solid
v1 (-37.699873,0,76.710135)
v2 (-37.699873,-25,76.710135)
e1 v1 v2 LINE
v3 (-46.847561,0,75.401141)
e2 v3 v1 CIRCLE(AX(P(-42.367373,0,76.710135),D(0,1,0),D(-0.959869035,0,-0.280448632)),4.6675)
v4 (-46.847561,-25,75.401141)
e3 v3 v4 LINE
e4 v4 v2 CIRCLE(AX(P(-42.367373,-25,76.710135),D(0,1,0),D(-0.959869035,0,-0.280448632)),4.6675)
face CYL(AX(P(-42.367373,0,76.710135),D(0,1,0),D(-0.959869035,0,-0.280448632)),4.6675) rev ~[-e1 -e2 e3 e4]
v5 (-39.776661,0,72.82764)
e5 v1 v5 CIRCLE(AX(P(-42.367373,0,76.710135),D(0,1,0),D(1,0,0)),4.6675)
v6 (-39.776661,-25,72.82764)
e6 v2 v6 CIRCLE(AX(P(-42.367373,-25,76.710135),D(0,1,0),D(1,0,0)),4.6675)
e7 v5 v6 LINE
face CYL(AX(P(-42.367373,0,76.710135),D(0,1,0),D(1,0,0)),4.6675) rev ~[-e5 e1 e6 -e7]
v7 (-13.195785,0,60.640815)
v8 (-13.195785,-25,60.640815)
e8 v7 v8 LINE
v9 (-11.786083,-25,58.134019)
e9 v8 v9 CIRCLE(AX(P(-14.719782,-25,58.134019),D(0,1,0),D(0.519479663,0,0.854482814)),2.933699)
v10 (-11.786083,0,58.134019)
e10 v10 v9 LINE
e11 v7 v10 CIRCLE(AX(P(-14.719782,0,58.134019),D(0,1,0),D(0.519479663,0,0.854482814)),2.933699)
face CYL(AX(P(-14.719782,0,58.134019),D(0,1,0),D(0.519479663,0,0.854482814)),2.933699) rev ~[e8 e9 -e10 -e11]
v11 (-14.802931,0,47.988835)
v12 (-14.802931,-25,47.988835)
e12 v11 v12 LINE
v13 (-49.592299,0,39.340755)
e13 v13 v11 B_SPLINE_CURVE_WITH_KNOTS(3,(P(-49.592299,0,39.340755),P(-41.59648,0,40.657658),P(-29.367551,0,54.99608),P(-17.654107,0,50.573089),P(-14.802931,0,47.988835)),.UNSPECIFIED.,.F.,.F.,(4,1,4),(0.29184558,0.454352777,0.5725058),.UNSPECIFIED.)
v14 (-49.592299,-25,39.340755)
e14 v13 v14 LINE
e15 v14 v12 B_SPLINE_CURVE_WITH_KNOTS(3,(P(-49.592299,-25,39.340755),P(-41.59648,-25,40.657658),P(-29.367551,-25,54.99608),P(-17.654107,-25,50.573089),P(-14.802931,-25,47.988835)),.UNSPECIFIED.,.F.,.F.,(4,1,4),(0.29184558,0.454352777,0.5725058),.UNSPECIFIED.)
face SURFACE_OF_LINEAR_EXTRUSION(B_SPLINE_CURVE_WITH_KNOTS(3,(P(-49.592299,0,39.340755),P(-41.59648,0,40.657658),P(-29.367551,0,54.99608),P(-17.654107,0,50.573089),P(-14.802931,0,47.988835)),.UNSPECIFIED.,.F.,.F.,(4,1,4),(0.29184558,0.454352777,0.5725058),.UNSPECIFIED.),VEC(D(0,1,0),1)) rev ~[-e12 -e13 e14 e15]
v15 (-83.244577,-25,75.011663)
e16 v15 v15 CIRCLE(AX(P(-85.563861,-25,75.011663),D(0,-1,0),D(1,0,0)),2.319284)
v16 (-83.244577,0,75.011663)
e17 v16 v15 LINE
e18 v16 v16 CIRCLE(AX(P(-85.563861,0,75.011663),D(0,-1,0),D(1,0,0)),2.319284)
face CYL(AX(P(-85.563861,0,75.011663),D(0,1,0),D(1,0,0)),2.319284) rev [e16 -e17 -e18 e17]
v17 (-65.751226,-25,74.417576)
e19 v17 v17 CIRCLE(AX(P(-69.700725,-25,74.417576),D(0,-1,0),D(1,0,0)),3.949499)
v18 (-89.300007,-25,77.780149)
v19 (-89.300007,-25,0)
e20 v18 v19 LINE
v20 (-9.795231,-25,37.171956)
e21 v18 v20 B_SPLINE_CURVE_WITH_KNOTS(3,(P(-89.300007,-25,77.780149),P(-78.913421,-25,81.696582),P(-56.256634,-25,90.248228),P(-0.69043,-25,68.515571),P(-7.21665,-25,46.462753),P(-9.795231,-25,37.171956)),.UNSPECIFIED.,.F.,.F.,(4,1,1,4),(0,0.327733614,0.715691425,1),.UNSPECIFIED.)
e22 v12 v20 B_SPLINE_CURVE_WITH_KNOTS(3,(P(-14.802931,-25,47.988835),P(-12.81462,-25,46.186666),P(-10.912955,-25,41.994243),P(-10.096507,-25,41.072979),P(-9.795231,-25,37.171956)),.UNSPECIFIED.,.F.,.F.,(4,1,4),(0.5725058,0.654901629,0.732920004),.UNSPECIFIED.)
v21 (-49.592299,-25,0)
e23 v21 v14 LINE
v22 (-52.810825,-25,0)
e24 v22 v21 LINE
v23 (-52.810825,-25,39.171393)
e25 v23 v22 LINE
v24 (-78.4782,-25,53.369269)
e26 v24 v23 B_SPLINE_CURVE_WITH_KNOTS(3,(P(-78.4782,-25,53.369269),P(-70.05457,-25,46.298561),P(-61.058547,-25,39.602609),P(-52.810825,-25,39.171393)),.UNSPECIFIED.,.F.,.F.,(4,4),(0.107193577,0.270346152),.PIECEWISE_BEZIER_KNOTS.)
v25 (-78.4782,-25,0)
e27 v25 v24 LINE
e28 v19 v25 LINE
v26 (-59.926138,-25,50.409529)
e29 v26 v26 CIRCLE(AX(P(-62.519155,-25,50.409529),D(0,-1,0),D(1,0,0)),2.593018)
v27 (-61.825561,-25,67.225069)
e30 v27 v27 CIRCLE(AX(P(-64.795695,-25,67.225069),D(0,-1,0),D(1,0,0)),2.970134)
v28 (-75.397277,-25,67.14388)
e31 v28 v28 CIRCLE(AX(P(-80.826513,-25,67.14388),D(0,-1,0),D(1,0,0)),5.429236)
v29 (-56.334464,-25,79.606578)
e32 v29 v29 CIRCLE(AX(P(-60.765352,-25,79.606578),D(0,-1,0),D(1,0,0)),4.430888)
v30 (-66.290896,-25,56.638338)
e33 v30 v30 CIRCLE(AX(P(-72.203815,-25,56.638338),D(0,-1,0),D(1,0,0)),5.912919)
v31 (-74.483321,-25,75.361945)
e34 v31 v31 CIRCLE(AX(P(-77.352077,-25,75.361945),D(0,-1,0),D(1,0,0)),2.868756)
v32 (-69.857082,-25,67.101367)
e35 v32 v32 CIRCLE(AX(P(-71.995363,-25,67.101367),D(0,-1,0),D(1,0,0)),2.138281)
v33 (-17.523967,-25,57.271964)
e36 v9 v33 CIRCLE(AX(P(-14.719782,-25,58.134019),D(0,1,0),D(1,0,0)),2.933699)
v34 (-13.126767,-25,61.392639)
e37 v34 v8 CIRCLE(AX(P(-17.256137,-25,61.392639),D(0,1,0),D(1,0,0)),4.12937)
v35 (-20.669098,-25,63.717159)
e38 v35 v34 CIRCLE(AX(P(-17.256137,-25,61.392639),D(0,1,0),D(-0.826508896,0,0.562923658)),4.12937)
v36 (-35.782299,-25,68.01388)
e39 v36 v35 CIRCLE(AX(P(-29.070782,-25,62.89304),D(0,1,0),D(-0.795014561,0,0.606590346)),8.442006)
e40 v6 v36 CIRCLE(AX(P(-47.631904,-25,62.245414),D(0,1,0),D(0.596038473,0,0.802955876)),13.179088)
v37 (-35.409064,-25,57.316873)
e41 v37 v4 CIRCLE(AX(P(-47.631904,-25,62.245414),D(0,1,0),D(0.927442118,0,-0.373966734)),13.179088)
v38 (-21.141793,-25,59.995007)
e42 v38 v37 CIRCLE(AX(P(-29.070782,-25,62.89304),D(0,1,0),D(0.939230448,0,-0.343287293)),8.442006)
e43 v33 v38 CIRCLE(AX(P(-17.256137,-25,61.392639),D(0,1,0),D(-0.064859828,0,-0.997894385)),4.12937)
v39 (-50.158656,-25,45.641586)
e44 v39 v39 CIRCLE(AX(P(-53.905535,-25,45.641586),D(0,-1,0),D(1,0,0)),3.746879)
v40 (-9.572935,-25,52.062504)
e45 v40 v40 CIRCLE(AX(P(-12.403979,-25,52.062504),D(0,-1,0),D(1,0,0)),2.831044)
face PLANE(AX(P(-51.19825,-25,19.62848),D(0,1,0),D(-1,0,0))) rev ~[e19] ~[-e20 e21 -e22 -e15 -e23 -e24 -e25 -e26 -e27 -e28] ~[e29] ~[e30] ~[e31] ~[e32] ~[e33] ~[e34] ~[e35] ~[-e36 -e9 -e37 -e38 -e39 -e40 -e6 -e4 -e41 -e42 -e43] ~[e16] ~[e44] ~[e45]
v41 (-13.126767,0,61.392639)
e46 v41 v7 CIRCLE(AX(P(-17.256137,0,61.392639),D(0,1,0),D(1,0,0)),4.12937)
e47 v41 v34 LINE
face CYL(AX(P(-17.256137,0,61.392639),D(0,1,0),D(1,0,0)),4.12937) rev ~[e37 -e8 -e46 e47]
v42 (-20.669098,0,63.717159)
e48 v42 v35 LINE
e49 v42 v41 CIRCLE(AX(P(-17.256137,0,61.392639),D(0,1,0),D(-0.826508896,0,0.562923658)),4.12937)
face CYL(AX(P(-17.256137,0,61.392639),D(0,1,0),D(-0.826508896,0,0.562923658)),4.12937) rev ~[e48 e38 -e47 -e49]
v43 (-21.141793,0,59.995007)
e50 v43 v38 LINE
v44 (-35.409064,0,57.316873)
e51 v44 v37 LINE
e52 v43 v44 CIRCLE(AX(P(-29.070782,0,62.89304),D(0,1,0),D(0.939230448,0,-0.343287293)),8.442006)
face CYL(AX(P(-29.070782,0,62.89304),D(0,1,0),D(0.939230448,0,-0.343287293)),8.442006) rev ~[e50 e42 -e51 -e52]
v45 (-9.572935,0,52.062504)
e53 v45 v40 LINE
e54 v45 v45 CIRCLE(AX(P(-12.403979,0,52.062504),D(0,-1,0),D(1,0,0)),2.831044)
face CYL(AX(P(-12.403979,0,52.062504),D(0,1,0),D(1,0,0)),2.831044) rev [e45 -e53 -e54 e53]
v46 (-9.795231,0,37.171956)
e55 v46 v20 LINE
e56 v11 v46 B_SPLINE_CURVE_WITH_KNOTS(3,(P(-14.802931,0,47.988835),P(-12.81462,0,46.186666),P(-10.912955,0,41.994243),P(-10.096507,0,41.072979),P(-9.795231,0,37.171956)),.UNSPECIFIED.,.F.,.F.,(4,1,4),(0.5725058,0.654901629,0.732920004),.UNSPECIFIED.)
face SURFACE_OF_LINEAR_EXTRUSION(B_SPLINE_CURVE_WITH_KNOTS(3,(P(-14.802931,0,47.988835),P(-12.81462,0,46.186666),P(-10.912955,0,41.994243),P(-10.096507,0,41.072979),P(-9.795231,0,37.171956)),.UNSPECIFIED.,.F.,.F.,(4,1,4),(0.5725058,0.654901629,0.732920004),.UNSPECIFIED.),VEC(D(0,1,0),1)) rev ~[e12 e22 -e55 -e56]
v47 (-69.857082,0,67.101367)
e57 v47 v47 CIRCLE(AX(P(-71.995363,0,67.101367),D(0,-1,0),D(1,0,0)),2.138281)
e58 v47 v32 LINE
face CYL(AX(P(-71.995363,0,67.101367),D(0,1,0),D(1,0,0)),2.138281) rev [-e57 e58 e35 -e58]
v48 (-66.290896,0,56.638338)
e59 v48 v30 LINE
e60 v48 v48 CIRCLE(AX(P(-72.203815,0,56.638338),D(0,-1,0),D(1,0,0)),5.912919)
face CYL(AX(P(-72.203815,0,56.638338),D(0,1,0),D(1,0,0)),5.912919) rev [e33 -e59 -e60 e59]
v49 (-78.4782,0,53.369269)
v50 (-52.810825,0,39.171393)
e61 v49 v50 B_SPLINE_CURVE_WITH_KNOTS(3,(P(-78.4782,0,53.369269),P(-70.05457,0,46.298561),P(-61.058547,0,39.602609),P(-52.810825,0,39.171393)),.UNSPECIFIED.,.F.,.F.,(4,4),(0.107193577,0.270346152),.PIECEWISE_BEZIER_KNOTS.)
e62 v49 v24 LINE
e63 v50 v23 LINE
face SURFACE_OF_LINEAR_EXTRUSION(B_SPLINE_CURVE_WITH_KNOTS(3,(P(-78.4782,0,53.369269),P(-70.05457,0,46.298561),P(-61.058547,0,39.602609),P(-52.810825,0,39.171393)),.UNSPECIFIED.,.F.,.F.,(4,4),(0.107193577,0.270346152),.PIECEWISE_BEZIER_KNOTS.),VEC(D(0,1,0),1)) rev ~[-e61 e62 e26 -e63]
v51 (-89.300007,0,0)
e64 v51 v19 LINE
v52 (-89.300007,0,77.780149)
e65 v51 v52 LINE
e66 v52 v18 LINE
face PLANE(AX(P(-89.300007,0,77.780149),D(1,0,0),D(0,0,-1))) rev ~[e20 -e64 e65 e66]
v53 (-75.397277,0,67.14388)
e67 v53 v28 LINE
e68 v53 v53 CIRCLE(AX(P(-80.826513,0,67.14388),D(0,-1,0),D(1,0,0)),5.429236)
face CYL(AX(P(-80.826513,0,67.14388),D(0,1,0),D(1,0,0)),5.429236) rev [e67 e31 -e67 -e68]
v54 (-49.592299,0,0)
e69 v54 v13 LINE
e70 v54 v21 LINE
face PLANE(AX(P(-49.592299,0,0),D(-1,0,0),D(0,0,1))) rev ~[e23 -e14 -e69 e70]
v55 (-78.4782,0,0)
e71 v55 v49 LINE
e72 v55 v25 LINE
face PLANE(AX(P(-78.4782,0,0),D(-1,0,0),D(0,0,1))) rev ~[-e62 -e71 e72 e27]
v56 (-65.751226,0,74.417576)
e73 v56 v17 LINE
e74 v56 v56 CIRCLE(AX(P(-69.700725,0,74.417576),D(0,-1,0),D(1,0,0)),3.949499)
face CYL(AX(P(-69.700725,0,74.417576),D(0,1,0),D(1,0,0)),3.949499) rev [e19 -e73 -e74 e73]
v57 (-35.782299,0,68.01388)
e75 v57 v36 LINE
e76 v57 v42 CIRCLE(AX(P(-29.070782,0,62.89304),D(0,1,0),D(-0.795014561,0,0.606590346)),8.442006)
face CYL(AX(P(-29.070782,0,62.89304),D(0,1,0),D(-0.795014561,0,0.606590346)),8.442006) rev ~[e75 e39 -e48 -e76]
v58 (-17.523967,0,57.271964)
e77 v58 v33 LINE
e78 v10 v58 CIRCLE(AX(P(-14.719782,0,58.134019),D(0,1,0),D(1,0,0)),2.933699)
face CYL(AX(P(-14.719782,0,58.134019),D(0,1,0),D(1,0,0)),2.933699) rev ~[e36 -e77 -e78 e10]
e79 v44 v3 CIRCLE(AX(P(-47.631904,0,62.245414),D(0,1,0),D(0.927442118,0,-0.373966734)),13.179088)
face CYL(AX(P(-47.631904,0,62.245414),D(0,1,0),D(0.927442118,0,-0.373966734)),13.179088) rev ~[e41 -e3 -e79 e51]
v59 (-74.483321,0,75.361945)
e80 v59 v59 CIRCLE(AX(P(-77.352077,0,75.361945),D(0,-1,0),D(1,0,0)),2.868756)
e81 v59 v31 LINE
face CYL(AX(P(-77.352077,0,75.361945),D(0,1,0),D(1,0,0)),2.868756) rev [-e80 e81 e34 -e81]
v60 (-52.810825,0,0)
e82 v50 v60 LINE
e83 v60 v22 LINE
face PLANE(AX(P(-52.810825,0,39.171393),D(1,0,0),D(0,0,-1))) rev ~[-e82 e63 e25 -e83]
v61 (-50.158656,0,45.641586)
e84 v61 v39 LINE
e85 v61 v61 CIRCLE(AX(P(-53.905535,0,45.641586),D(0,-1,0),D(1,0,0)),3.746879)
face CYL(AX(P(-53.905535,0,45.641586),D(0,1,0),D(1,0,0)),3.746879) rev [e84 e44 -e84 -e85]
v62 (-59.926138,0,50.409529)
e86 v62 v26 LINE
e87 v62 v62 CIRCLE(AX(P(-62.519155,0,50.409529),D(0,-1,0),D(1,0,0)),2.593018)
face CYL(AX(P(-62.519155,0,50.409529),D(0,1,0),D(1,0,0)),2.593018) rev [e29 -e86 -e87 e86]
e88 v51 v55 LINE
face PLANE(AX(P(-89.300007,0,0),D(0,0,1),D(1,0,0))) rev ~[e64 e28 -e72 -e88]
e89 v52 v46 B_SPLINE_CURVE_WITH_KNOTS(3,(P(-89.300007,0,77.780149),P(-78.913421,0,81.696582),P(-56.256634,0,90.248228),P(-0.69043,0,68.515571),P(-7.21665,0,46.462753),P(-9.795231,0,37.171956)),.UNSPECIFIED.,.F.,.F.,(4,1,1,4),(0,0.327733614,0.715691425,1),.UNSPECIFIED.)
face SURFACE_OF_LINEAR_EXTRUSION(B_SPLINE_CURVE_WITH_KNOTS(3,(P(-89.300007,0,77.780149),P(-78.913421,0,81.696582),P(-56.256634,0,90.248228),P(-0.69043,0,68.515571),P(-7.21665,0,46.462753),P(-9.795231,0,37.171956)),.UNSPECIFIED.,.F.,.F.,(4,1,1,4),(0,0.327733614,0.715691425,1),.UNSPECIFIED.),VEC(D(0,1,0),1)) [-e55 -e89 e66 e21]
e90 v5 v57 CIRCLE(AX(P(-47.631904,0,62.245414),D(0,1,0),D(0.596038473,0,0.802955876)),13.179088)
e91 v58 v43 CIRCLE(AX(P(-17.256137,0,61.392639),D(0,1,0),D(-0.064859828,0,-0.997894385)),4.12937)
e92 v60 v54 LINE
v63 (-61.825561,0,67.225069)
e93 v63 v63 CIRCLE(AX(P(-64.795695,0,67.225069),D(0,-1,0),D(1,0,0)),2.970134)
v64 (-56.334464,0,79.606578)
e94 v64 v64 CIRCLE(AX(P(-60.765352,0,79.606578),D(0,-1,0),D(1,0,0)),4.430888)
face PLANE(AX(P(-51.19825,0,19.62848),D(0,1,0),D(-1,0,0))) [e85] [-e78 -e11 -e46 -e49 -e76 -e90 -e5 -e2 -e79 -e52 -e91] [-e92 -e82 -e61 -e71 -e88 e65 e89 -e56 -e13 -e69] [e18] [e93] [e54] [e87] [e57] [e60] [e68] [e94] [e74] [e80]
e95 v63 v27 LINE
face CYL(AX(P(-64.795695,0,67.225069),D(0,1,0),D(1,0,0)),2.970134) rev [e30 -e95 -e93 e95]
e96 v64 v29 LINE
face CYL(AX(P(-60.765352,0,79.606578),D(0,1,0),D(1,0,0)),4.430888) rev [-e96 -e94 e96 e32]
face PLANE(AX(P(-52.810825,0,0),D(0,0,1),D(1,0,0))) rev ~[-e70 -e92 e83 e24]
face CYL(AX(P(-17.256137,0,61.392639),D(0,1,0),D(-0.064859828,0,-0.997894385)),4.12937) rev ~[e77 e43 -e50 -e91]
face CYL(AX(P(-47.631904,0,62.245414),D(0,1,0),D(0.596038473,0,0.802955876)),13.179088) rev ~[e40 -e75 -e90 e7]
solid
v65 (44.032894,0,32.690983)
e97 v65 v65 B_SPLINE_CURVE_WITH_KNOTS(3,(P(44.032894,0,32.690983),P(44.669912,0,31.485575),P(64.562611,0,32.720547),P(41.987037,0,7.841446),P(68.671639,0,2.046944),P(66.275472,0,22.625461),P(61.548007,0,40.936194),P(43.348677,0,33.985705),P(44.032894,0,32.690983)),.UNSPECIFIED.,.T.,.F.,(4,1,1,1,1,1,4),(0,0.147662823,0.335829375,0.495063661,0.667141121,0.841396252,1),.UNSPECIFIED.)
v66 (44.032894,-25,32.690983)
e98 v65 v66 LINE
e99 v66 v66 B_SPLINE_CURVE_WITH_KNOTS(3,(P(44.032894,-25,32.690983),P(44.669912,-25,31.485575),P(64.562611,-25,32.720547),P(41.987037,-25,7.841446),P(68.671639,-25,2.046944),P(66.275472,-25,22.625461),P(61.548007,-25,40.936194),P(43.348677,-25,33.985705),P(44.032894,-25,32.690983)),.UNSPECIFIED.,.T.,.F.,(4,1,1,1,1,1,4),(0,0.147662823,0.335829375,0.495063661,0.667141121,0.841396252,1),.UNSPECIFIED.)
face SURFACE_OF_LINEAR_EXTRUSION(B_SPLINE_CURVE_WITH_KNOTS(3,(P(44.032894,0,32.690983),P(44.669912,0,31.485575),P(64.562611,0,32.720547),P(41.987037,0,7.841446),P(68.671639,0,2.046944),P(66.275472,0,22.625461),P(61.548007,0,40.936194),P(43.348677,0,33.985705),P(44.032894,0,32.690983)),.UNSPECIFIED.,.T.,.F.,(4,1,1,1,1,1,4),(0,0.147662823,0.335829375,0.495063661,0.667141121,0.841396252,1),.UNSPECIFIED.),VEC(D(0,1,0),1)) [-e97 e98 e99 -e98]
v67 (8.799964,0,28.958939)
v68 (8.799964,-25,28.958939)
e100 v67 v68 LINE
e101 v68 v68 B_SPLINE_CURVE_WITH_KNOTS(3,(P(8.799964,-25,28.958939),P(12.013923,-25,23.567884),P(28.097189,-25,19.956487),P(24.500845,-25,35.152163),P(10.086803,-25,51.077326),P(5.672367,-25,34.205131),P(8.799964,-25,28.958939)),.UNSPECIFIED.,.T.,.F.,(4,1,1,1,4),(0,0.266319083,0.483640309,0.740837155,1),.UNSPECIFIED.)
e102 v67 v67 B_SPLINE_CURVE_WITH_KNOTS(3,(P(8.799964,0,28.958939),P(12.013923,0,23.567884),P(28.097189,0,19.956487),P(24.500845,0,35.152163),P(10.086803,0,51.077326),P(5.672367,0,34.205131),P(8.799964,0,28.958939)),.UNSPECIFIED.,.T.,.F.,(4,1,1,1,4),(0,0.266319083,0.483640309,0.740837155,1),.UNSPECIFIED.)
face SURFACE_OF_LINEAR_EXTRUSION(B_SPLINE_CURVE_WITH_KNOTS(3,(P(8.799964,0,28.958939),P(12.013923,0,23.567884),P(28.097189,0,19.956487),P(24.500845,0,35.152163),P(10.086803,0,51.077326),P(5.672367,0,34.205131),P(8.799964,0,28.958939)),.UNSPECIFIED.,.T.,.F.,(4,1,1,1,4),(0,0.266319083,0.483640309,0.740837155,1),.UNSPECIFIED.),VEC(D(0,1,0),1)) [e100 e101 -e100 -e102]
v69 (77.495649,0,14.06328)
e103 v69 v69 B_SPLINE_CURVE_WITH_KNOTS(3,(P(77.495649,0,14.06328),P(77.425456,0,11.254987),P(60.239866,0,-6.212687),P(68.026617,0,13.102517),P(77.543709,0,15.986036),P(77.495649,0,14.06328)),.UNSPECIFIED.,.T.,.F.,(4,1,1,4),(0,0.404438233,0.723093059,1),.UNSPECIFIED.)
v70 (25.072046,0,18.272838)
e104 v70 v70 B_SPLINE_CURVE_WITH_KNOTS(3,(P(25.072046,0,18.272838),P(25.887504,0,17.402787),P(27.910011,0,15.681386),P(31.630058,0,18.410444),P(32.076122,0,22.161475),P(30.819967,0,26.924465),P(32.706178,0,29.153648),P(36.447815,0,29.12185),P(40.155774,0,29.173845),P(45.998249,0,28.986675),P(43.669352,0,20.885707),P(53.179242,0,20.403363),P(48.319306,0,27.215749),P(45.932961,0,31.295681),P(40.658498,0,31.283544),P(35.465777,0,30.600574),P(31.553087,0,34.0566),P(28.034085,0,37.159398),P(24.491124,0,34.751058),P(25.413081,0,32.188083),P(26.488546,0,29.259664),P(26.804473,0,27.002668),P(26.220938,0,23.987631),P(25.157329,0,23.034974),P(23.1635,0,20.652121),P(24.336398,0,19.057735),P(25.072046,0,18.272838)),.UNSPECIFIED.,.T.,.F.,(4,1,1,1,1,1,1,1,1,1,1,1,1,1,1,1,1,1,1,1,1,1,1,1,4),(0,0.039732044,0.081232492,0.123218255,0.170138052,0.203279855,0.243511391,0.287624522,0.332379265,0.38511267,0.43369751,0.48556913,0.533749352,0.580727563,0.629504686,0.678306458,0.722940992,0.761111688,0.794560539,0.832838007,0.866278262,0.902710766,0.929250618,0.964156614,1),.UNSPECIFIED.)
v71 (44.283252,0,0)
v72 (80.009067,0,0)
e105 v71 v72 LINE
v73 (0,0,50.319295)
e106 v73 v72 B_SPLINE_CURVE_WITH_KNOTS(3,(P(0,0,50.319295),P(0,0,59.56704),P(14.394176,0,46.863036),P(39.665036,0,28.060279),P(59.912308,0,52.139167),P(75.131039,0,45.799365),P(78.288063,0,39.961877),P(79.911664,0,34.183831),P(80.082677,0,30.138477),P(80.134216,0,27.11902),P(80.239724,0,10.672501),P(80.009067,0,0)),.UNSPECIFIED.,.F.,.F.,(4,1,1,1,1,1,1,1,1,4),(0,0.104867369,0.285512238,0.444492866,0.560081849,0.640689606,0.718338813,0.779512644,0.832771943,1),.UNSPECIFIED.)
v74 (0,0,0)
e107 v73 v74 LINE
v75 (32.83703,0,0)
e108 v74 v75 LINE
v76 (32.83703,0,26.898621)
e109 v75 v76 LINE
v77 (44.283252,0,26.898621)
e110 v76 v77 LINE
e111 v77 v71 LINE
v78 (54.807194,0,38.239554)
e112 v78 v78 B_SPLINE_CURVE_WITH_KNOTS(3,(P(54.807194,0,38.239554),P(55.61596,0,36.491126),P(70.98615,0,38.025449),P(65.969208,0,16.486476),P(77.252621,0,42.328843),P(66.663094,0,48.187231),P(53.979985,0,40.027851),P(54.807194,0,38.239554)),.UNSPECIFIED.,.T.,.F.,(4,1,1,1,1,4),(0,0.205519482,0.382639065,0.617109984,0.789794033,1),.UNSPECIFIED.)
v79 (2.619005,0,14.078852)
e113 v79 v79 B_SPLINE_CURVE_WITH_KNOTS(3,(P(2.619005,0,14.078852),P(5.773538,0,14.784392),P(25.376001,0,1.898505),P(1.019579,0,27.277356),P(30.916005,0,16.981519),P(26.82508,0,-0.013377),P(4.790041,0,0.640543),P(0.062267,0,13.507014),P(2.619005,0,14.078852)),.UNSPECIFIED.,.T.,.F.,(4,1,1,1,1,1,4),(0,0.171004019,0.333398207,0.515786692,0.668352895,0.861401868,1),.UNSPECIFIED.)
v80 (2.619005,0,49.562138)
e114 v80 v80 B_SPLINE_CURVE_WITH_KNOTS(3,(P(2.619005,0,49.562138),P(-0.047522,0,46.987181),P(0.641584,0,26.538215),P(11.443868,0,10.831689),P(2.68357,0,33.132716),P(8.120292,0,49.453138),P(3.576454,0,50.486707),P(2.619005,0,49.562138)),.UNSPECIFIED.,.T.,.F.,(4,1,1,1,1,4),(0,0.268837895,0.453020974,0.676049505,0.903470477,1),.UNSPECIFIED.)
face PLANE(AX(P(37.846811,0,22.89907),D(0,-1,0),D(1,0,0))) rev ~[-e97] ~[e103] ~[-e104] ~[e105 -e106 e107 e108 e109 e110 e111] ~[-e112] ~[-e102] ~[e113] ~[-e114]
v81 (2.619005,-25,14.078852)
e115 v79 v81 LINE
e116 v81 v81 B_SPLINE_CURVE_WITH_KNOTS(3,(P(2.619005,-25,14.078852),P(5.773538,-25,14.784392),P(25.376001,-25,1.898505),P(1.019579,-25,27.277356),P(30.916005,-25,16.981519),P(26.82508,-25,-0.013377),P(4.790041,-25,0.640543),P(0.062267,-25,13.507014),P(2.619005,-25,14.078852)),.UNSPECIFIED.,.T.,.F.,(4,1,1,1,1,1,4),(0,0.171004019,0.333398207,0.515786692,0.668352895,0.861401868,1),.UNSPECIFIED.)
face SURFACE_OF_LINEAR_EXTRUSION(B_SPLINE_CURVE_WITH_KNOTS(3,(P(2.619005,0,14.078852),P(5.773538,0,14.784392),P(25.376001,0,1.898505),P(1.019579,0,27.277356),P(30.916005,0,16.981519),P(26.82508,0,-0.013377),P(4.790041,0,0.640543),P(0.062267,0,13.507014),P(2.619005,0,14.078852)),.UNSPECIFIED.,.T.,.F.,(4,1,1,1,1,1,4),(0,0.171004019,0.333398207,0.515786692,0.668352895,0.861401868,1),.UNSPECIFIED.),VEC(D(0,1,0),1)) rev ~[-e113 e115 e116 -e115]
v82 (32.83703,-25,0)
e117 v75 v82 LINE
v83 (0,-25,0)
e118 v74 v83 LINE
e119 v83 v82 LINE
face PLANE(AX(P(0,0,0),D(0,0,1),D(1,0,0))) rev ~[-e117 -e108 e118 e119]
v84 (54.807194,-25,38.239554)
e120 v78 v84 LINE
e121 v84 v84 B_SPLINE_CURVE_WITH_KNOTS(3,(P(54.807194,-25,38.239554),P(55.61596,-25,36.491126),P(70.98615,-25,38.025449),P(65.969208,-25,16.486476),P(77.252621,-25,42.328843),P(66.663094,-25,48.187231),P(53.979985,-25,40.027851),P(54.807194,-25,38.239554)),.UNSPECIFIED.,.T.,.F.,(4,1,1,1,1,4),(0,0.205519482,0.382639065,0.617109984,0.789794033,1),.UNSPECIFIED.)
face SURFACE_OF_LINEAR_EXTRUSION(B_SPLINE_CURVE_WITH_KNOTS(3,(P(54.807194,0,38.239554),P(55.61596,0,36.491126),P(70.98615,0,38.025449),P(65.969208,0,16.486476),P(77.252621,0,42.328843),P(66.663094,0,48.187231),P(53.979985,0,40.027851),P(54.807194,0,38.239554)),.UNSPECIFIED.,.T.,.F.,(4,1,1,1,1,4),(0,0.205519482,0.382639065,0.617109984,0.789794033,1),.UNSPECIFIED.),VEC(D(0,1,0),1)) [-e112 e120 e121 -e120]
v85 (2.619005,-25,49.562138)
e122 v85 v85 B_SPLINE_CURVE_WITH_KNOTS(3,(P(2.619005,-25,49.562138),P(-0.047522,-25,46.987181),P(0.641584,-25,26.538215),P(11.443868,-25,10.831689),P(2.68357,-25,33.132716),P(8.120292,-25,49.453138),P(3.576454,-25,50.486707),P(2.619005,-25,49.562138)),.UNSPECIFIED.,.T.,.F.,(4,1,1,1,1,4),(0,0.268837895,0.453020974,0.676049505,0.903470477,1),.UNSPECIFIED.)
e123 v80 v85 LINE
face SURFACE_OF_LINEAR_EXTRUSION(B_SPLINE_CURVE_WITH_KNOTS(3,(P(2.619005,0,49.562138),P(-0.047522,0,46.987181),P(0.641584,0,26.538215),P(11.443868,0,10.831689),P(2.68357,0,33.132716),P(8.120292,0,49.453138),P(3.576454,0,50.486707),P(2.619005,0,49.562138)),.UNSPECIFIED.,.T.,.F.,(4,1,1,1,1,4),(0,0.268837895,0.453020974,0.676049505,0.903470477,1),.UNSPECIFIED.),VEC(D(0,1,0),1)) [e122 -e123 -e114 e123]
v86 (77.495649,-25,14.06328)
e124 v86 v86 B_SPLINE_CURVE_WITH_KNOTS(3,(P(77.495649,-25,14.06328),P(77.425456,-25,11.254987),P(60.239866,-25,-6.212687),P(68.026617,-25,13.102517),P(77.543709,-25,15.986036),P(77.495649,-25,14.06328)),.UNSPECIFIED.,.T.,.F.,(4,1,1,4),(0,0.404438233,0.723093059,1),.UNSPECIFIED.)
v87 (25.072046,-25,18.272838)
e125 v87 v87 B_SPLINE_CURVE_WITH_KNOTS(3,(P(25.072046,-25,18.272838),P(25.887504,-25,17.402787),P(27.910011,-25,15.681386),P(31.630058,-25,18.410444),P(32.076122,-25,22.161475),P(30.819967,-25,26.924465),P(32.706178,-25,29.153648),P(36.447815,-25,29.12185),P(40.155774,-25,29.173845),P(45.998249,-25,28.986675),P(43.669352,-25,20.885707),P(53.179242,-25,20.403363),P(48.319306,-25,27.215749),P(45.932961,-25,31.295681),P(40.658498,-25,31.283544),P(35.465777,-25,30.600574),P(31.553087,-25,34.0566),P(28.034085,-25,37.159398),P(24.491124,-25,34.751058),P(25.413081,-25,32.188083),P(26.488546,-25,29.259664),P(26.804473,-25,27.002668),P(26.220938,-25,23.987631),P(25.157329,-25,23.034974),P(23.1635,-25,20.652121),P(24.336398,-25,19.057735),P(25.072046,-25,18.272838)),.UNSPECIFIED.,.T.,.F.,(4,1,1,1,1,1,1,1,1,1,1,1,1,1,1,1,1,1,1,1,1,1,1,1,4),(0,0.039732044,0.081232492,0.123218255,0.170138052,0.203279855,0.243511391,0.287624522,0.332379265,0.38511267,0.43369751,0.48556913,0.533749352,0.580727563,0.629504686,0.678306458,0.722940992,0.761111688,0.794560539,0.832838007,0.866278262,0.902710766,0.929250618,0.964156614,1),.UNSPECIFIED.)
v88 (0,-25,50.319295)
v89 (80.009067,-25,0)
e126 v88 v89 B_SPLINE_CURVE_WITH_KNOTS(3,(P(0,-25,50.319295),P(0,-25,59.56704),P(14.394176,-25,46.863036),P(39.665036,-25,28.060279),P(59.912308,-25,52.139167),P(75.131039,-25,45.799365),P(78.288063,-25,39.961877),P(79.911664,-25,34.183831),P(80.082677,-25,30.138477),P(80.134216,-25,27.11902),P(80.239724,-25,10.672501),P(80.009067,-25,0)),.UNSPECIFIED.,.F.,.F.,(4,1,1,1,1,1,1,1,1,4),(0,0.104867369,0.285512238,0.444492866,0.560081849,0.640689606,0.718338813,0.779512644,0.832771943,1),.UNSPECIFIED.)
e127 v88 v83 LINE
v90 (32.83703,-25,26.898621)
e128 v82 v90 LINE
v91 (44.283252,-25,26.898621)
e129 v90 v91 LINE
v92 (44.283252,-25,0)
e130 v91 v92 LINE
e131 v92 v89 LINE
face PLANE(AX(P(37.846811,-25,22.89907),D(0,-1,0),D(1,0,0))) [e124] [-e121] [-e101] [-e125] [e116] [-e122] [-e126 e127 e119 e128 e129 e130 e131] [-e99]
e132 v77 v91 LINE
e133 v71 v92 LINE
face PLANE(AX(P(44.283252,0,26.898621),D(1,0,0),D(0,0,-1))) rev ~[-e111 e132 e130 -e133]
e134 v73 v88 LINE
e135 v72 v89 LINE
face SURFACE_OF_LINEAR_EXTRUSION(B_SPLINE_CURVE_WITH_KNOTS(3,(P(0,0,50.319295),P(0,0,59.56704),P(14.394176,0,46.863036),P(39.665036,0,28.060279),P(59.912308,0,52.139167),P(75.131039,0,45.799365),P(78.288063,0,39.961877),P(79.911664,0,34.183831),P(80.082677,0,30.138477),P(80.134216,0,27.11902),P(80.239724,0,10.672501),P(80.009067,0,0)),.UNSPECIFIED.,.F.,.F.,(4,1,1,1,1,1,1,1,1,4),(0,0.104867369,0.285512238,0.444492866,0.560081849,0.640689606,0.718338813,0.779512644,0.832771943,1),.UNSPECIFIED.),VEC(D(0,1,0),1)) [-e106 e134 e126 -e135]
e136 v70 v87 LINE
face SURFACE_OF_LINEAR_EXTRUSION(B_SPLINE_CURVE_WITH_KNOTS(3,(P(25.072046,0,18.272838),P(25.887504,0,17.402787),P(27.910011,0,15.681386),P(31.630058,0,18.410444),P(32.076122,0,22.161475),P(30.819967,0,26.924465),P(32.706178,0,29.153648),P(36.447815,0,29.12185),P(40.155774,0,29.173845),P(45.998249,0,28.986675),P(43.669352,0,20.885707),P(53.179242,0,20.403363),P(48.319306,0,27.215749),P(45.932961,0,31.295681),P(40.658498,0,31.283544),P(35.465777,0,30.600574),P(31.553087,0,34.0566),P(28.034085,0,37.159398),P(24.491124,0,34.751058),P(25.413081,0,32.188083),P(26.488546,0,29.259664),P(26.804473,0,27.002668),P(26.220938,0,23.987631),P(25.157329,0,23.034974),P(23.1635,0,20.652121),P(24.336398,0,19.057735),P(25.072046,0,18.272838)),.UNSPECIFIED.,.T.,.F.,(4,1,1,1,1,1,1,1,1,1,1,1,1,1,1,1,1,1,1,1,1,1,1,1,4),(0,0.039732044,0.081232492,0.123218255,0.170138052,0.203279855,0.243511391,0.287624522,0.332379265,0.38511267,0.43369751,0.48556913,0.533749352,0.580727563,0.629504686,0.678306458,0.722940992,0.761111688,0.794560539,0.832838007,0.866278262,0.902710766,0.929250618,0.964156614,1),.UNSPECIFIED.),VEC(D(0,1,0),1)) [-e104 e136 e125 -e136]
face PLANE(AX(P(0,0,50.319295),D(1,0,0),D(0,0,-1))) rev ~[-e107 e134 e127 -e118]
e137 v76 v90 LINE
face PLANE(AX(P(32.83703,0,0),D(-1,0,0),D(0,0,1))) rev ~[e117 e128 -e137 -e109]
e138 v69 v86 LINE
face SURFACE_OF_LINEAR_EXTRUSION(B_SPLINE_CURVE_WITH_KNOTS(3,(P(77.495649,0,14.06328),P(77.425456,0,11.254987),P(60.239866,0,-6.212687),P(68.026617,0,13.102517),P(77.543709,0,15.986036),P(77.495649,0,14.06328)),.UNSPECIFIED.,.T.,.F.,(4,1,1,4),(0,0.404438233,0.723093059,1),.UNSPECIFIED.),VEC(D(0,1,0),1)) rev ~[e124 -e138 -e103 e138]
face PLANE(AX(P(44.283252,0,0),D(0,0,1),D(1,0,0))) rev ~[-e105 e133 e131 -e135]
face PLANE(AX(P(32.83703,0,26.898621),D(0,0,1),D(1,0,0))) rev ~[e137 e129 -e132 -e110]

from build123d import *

# Parameters (mm, degrees)
F1_DEPTH = 25
F0_R     = 3.7468792803
F0_R_2   = 2.5930177145
F0_R_3   = 5.9129187482
F0_R_4   = 2.8310435697
F0_R_5   = 5.4292359739
F0_R_6   = 2.1382808776
F0_R_7   = 2.3192836327
F0_R_8   = 3.9494993962
F0_R_9   = 2.868756134
F0_R_10  = 2.9701337928
F0_R_11  = 4.4308880969
F2_DEPTH = 25
F3_DEPTH = 25


# Not quite as in the source:
# - a feature names something its author has since deleted; it is built from what else it names


with BuildPart() as f1:
    # F0 (on Front) → F1 (new body)
    with BuildSketch(Plane.XZ):
        with BuildLine():
            Line((0, 50.3192950504), (0, 0))
            Line((0, 0), (32.8370295465, 0))
            Line((32.8370295465, 0), (32.8370295465, 26.8986206502))
            Line((32.8370295465, 26.8986206502), (44.2832522094, 26.8986206502))
            Line((44.2832522094, 26.8986206502), (44.2832522094, 0))
            Line((44.2832522094, 0), (80.0090666652, 0))
            add(Edge.make_bspline(
                [(0, 50.3192950504), (0, 59.5670401082), (14.3941760892, 46.8630363864), (39.6650361306, 28.0602790595), (59.9123084229, 52.1391667117), (75.1310389197, 45.7993651518), (78.2880633586, 39.9618765746), (79.9116639555, 34.1838305265), (80.0826767357, 30.1384767337), (80.1342161447, 27.1190199724), (80.2397243312, 10.6725007615), (80.0090666652, 0)],
                knots=[0, 0, 0, 0, 0.1048673687, 0.2855122378, 0.4444928656, 0.5600818488, 0.6406896061, 0.7183388135, 0.7795126437, 0.8327719435, 1, 1, 1, 1], degree=3))
        make_face()
        with BuildLine():
            add(Edge.make_bspline(
                [(2.6190045755, 14.0788517892), (5.7735380649, 14.7843920782), (25.3760012063, 1.8985051433), (1.0195787159, 27.2773558636), (30.9160049406, 16.9815187886), (26.8250802338, -0.0133766262), (4.7900411144, 0.6405429526), (0.0622667044, 13.507013962), (2.6190045755, 14.0788517892)],
                knots=[0, 0, 0, 0, 0.1710040186, 0.3333982072, 0.515786692, 0.6683528953, 0.8614018675, 1, 1, 1, 1], degree=3))
        make_face(mode=Mode.SUBTRACT)
        with BuildLine():
            add(Edge.make_bspline(
                [(77.495649457, 14.0632800758), (77.4254563321, 11.254987106), (60.23986575, -6.2126871426), (68.0266170098, 13.1025166472), (77.5437086212, 15.9860355192), (77.495649457, 14.0632800758)],
                knots=[0, 0, 0, 0, 0.4044382334, 0.7230930594, 1, 1, 1, 1], degree=3))
        make_face(mode=Mode.SUBTRACT)
        with BuildLine():
            add(Edge.make_bspline(
                [(2.6190045755, 49.562137574), (-0.0475222277, 46.987181341), (0.6415840322, 26.5382148544), (11.4438679539, 10.8316888041), (2.6835703926, 33.1327162554), (8.1202915155, 49.4531375969), (3.5764535283, 50.4867069972), (2.6190045755, 49.562137574)],
                knots=[0, 0, 0, 0, 0.2688378954, 0.4530209736, 0.6760495052, 0.9034704766, 1, 1, 1, 1], degree=3))
        make_face(mode=Mode.SUBTRACT)
        with BuildLine():
            add(Edge.make_bspline(
                [(8.7999636307, 28.9589390159), (12.0139225942, 23.5678839806), (28.0971888261, 19.9564866654), (24.5008453549, 35.1521631992), (10.0868025916, 51.0773257342), (5.6723666995, 34.205131446), (8.7999636307, 28.9589390159)],
                knots=[0, 0, 0, 0, 0.2663190833, 0.4836403085, 0.7408371553, 1, 1, 1, 1], degree=3))
        make_face(mode=Mode.SUBTRACT)
        with BuildLine():
            add(Edge.make_bspline(
                [(44.0328940749, 32.6909832656), (44.6699120983, 31.4855753989), (64.5626106916, 32.7205472665), (41.987037479, 7.8414458788), (68.6716391837, 2.0469439032), (66.2754723671, 22.6254610166), (61.5480065133, 40.9361936385), (43.3486768569, 33.9857045871), (44.0328940749, 32.6909832656)],
                knots=[0, 0, 0, 0, 0.1476628231, 0.335829375, 0.4950636606, 0.6671411211, 0.8413962521, 1, 1, 1, 1], degree=3))
        make_face(mode=Mode.SUBTRACT)
        with BuildLine():
            add(Edge.make_bspline(
                [(25.0720456243, 18.272837624), (25.8875038676, 17.4027869609), (27.9100110865, 15.6813861052), (31.6300578474, 18.4104435466), (32.07612217, 22.161475039), (30.8199667761, 26.9244646071), (32.7061778665, 29.1536475996), (36.4478146426, 29.12185021), (40.1557735248, 29.173844897), (45.9982486225, 28.9866748309), (43.6693515523, 20.8857068322), (53.1792420497, 20.403362512), (48.3193055137, 27.2157493364), (45.9329611974, 31.2956808101), (40.6584975804, 31.2835436037), (35.4657767382, 30.6005737382), (31.5530871062, 34.0566001583), (28.0340849021, 37.1593977156), (24.4911243904, 34.7510580977), (25.4130809672, 32.1880830646), (26.4885455649, 29.2596642376), (26.8044725158, 27.0026681032), (26.2209382301, 23.9876310328), (25.157328577, 23.0349735937), (23.1635004753, 20.652120897), (24.3363979719, 19.0577346226), (25.0720456243, 18.272837624)],
                knots=[0, 0, 0, 0, 0.0397320435, 0.081232492, 0.1232182551, 0.1701380523, 0.2032798553, 0.2435113911, 0.2876245222, 0.3323792652, 0.3851126704, 0.4336975099, 0.4855691297, 0.5337493517, 0.5807275633, 0.629504686, 0.6783064578, 0.7229409921, 0.7611116883, 0.7945605394, 0.8328380067, 0.8662782619, 0.9027107661, 0.9292506183, 0.9641566141, 1, 1, 1, 1], degree=3))
        make_face(mode=Mode.SUBTRACT)
        with BuildLine():
            add(Edge.make_bspline(
                [(54.8071935773, 38.2395535707), (55.6159599566, 36.4911262021), (70.9861496935, 38.0254487245), (65.9692079193, 16.4864759001), (77.2526212543, 42.3288430166), (66.6630938588, 48.1872312905), (53.9799848043, 40.0278505318), (54.8071935773, 38.2395535707)],
                knots=[0, 0, 0, 0, 0.2055194821, 0.3826390649, 0.6171099844, 0.7897940333, 1, 1, 1, 1], degree=3))
        make_face(mode=Mode.SUBTRACT)
    extrude(amount=F1_DEPTH)


with BuildPart() as f2:
    # F0 (on Front) → F2 (new body)
    with BuildSketch(Plane.XZ):
        with BuildLine():
            Line((-89.300006628, 77.7801488219), (-89.300006628, 53.369268775))
            add(Edge.make_bspline(
                [(-89.300006628, 53.369268775), (-89.300006628, 62.82215087), (-84.0126453614, 58.0148248406), (-78.4782001296, 53.369268775)],
                knots=[0, 0, 0, 0, 0.107193577, 0.107193577, 0.107193577, 0.107193577], degree=3))
            add(Edge.make_bspline(
                [(-78.4782001296, 53.369268775), (-70.0545704822, 46.2985612037), (-61.0585470584, 39.6026093166), (-52.8108254075, 39.1713934549)],
                knots=[0.107193577, 0.107193577, 0.107193577, 0.107193577, 0.2703461524, 0.2703461524, 0.2703461524, 0.2703461524], degree=3))
            add(Edge.make_bspline(
                [(-52.8108254075, 39.1713934549), (-51.7239820399, 39.1145699928), (-50.6501326676, 39.1665314523), (-49.5922993401, 39.3407554389)],
                knots=[0.2703461524, 0.2703461524, 0.2703461524, 0.2703461524, 0.29184558, 0.29184558, 0.29184558, 0.29184558], degree=3))
            add(Edge.make_bspline(
                [(-49.5922993401, 39.3407554389), (-41.596480456, 40.657658023), (-29.3675509948, 54.996079558), (-17.654106763, 50.5730889301), (-14.8029311421, 47.9888351508)],
                knots=[0.29184558, 0.29184558, 0.29184558, 0.29184558, 0.4543527773, 0.5725057998, 0.5725057998, 0.5725057998, 0.5725057998], degree=3))
            add(Edge.make_bspline(
                [(-14.8029311421, 47.9888351508), (-12.8146199192, 46.1866659843), (-10.9129551381, 41.9942429453), (-10.0965067426, 41.0729792704), (-9.7952308133, 37.1719561517)],
                knots=[0.5725057998, 0.5725057998, 0.5725057998, 0.5725057998, 0.6549016294, 0.7329200043, 0.7329200043, 0.7329200043, 0.7329200043], degree=3))
            add(Edge.make_bspline(
                [(-89.300006628, 77.7801488219), (-78.9134210308, 81.696581655), (-56.2566339838, 90.2482278427), (-0.690429825, 68.5155712372), (-7.2166502591, 46.4627534749), (-9.7952308133, 37.1719561517)],
                knots=[0, 0, 0, 0, 0.327733614, 0.7156914248, 1, 1, 1, 1], degree=3))
        make_face()
        with Locations((-53.9055354893, 45.6415861845)):
            Circle(F0_R, mode=Mode.SUBTRACT)
        with Locations((-62.5191554427, 50.4095293581)):
            Circle(F0_R_2, mode=Mode.SUBTRACT)
        with Locations((-72.2038149834, 56.6383376718)):
            Circle(F0_R_3, mode=Mode.SUBTRACT)
        with Locations((-12.4039789662, 52.0625039935)):
            Circle(F0_R_4, mode=Mode.SUBTRACT)
        with BuildLine():
            ThreePointArc((-39.7766612224, 72.8276395151), (-37.4897480211, 70.6611734611), (-35.7822989432, 68.0138795977))
            ThreePointArc((-35.7822989432, 68.0138795977), (-26.7621850313, 71.013252374), (-20.6690978996, 63.7171588136))
            ThreePointArc((-20.6690978996, 63.7171588136), (-16.0399302882, 65.3388441781), (-13.1267671338, 61.3926388323))
            ThreePointArc((-13.1267671338, 61.3926388323), (-13.1440578564, 61.0151463046), (-13.195785223, 60.6408150915))
            ThreePointArc((-13.195785223, 60.6408150915), (-12.1626803516, 59.5720114752), (-11.7860830002, 58.1340193748))
            ThreePointArc((-11.7860830002, 58.1340193748), (-14.283917234, 55.2328793039), (-17.523967202, 57.2719638474))
            ThreePointArc((-17.523967202, 57.2719638474), (-19.7394015452, 58.0933824806), (-21.1417928127, 59.9950072158))
            ThreePointArc((-21.1417928127, 59.9950072158), (-27.5133197329, 54.5959463003), (-35.4090635434, 57.3168733014))
            ThreePointArc((-35.4090635434, 57.3168733014), (-58.769987473, 55.2004539015), (-46.8475612525, 75.4011407942))
            ThreePointArc((-46.8475612525, 75.4011407942), (-43.0285365362, 81.3305694971), (-37.6998727989, 76.7101347446))
            ThreePointArc((-37.6998727989, 76.7101347446), (-38.2516892278, 74.5086114445), (-39.7766612224, 72.8276395151))
        make_face(mode=Mode.SUBTRACT)
        with Locations((-80.8265134692, 67.1438798308)):
            Circle(F0_R_5, mode=Mode.SUBTRACT)
        with Locations((-71.9953626394, 67.101366818)):
            Circle(F0_R_6, mode=Mode.SUBTRACT)
        with Locations((-85.5638608336, 75.0116631389)):
            Circle(F0_R_7, mode=Mode.SUBTRACT)
        with Locations((-69.7007253766, 74.4175761938)):
            Circle(F0_R_8, mode=Mode.SUBTRACT)
        with Locations((-77.3520767689, 75.3619447351)):
            Circle(F0_R_9, mode=Mode.SUBTRACT)
        with Locations((-64.7956952453, 67.2250688076)):
            Circle(F0_R_10, mode=Mode.SUBTRACT)
        with Locations((-60.7653521001, 79.606577754)):
            Circle(F0_R_11, mode=Mode.SUBTRACT)
    extrude(amount=F2_DEPTH)

    # F0 (on Front) → F3 (join)
    with BuildSketch(Plane.XZ):
        with BuildLine():
            add(Edge.make_bspline(
                [(-52.8108254075, 39.1713934549), (-51.7239820399, 39.1145699928), (-50.6501326676, 39.1665314523), (-49.5922993401, 39.3407554389)],
                knots=[0.2703461524, 0.2703461524, 0.2703461524, 0.2703461524, 0.29184558, 0.29184558, 0.29184558, 0.29184558], degree=3))
            Line((-52.8108254075, 39.1713934549), (-52.8108254075, 0))
            Line((-52.8108254075, 0), (-49.5922993401, 0))
            Line((-49.5922993401, 0), (-49.5922993401, 39.3407554389))
        make_face()
        with BuildLine():
            add(Edge.make_bspline(
                [(-89.300006628, 53.369268775), (-89.300006628, 62.82215087), (-84.0126453614, 58.0148248406), (-78.4782001296, 53.369268775)],
                knots=[0, 0, 0, 0, 0.107193577, 0.107193577, 0.107193577, 0.107193577], degree=3))
            Line((-89.300006628, 53.369268775), (-89.300006628, 0))
            Line((-89.300006628, 0), (-78.4782001296, 0))
            Line((-78.4782001296, 0), (-78.4782001296, 53.369268775))
        make_face()
    extrude(amount=F3_DEPTH)


solid = Compound([f1.part, f2.part])
